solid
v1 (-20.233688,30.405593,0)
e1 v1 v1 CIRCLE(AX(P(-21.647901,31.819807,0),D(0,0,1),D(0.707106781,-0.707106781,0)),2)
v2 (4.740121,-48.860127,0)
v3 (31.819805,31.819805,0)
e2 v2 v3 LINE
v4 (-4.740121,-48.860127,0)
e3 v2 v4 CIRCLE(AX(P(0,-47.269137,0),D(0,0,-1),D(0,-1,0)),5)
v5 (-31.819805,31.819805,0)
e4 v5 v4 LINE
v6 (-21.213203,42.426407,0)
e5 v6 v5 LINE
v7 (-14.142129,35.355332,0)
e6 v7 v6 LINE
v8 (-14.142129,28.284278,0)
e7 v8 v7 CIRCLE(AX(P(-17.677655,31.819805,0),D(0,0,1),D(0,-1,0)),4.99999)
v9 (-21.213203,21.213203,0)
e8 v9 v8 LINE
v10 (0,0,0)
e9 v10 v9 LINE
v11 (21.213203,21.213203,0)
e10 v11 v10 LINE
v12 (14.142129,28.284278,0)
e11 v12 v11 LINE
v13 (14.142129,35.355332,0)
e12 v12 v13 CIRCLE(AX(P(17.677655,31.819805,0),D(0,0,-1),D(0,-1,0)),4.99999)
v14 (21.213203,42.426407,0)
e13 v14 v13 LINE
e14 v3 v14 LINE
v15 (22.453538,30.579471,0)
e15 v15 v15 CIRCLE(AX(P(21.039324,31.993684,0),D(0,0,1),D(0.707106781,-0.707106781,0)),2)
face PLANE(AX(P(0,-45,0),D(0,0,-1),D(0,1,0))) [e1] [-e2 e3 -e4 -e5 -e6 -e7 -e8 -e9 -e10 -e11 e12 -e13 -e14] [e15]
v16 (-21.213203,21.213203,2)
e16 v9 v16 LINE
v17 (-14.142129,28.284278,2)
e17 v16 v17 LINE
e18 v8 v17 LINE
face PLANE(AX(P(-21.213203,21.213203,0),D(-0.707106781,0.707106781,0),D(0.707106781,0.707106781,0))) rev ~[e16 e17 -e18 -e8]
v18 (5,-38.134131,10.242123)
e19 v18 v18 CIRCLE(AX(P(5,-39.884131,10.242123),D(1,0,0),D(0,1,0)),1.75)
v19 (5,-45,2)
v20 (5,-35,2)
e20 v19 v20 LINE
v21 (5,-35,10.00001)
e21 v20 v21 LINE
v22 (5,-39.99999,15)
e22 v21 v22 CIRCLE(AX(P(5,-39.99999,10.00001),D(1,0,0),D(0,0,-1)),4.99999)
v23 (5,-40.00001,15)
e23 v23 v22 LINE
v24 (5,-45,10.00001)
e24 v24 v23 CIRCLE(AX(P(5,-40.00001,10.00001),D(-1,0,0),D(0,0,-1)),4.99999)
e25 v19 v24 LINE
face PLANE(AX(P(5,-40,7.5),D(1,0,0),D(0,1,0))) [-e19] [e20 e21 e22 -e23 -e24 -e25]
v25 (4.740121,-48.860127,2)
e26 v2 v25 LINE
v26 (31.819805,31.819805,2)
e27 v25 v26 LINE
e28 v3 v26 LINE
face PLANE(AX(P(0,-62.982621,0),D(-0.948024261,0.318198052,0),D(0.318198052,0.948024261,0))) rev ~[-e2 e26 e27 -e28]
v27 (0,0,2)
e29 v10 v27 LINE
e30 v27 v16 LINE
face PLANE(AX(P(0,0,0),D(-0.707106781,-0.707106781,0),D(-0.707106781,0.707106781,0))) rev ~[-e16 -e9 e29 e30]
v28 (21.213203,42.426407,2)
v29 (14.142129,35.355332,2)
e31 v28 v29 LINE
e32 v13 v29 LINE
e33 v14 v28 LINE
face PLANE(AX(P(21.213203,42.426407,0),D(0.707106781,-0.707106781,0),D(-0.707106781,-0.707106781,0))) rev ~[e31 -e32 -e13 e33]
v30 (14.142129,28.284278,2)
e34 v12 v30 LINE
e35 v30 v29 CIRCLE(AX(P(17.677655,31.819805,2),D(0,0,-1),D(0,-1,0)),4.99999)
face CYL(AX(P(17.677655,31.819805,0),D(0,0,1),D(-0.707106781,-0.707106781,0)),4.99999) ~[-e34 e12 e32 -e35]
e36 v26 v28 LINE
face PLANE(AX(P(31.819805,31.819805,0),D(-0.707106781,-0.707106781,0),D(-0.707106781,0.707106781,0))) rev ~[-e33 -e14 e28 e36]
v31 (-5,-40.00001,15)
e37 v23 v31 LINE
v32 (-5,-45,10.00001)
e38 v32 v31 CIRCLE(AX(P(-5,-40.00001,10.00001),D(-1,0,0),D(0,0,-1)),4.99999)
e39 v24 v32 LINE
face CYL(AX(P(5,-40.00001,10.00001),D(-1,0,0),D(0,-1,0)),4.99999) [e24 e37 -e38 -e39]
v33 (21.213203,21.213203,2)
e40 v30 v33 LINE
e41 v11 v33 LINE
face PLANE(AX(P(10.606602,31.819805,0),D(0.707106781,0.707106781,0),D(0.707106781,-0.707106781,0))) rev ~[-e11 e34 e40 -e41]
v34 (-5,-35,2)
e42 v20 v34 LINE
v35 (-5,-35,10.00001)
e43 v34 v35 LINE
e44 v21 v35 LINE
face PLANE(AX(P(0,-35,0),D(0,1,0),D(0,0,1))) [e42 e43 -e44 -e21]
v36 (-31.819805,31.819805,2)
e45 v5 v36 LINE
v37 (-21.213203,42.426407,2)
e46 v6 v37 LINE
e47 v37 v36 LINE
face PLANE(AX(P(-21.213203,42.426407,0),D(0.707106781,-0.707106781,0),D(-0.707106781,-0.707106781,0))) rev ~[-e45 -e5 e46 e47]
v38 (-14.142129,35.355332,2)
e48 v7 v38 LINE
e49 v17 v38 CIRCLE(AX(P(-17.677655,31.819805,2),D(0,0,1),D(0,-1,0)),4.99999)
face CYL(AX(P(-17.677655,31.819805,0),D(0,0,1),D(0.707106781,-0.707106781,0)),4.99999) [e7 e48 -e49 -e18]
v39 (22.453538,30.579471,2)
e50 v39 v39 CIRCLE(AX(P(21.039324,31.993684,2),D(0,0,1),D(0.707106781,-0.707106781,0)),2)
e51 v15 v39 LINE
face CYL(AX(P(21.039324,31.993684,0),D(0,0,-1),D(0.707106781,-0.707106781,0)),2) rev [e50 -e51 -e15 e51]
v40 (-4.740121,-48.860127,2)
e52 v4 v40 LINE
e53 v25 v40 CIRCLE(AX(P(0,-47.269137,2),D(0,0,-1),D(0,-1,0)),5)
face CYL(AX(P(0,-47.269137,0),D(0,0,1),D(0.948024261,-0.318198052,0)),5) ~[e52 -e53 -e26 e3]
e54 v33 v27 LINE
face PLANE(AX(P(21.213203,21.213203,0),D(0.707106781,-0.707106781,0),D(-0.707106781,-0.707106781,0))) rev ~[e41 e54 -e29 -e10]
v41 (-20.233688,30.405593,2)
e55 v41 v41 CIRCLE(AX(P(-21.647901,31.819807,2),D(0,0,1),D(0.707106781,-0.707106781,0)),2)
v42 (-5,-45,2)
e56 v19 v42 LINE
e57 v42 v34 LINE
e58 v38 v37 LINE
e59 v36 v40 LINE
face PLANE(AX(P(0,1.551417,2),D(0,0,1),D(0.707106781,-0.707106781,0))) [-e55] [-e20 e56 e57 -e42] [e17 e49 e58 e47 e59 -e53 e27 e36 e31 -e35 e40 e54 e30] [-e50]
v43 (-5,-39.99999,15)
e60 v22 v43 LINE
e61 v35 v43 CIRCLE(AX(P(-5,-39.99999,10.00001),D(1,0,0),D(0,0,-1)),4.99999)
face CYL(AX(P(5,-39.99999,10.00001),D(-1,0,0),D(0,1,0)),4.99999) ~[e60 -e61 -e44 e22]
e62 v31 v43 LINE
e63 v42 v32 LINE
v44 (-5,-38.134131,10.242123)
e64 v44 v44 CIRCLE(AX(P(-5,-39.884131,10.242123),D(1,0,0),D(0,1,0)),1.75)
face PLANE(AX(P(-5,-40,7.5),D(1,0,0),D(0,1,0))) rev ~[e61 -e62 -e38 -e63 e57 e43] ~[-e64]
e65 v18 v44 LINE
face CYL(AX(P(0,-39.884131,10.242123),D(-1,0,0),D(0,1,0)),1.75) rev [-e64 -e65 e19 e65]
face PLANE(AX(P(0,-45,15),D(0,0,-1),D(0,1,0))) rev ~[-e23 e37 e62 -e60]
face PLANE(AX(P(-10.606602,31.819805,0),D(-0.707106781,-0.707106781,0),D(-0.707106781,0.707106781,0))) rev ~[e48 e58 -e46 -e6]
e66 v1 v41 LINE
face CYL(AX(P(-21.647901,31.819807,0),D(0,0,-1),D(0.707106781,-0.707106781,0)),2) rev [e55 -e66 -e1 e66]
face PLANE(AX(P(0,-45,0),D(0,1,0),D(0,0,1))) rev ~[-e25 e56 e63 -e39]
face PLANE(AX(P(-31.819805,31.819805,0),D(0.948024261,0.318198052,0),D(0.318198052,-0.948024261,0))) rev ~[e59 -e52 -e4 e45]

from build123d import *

# Parameters (mm, degrees)
F0_R     = 2
F1_DEPTH = 2
F2_ANGLE = 45
F3_W     = 10
F3_H     = 15
F3_R     = 1.75
F4_DEPTH = 5
F5_R     = 4.99999
F6_R     = 5


# Not quite as in the source:
# - a fillet or chamfer is up to 0.001 mm smaller than in the source, because OpenCascade refuses the exact size


with BuildPart() as f1:
    # F0 (on Top) → F1 (new body)
    with BuildSketch(Plane.XY):
        Polygon((0, 0), (-30, 0), (-30, 15), (-45, 15), (-45, 0), (44.535438389, -44.535438389), (0, 45), (-15, 45), (-15, 30), (0, 30), align=None)
        with Locations((-37.8073789179, 7.1926233359)):
            Circle(F0_R, mode=Mode.SUBTRACT)
        with Locations((-7.745902054, 37.5)):
            Circle(F0_R, mode=Mode.SUBTRACT)
    extrude(amount=F1_DEPTH)


with BuildPart() as f1_1:
    # F2: moved
    add(f1.part.rotate(Axis((0, 0, 1), (0, 0, -1)), F2_ANGLE))

    # F3 (on Right) → F4 (join, symmetric)
    with BuildSketch(Plane.YZ):
        with Locations((-40, 7.5)):
            Rectangle(F3_W, F3_H)
        with Locations((-39.8841314018, 10.2421231568)):
            Circle(F3_R, mode=Mode.SUBTRACT)
    extrude(amount=F4_DEPTH, both=True)

    # F5 (radius 5 in the source; OpenCascade refuses exactly that, so slightly less here)
    f5_edges = [f1_1.edges().sort_by_distance(p)[0] for p in [
        (0, -45, 15),
        (0, -35, 15),
        (10.606602, 31.819805, 1),
        (-10.606602, 31.819805, 1),
    ]]
    fillet(f5_edges, radius=F5_R)

    # F6
    f6_edges = [f1_1.edges().sort_by_distance(p)[0] for p in [
        (0, -62.982621, 1),
    ]]
    fillet(f6_edges, radius=F6_R)


solid = f1_1.part
